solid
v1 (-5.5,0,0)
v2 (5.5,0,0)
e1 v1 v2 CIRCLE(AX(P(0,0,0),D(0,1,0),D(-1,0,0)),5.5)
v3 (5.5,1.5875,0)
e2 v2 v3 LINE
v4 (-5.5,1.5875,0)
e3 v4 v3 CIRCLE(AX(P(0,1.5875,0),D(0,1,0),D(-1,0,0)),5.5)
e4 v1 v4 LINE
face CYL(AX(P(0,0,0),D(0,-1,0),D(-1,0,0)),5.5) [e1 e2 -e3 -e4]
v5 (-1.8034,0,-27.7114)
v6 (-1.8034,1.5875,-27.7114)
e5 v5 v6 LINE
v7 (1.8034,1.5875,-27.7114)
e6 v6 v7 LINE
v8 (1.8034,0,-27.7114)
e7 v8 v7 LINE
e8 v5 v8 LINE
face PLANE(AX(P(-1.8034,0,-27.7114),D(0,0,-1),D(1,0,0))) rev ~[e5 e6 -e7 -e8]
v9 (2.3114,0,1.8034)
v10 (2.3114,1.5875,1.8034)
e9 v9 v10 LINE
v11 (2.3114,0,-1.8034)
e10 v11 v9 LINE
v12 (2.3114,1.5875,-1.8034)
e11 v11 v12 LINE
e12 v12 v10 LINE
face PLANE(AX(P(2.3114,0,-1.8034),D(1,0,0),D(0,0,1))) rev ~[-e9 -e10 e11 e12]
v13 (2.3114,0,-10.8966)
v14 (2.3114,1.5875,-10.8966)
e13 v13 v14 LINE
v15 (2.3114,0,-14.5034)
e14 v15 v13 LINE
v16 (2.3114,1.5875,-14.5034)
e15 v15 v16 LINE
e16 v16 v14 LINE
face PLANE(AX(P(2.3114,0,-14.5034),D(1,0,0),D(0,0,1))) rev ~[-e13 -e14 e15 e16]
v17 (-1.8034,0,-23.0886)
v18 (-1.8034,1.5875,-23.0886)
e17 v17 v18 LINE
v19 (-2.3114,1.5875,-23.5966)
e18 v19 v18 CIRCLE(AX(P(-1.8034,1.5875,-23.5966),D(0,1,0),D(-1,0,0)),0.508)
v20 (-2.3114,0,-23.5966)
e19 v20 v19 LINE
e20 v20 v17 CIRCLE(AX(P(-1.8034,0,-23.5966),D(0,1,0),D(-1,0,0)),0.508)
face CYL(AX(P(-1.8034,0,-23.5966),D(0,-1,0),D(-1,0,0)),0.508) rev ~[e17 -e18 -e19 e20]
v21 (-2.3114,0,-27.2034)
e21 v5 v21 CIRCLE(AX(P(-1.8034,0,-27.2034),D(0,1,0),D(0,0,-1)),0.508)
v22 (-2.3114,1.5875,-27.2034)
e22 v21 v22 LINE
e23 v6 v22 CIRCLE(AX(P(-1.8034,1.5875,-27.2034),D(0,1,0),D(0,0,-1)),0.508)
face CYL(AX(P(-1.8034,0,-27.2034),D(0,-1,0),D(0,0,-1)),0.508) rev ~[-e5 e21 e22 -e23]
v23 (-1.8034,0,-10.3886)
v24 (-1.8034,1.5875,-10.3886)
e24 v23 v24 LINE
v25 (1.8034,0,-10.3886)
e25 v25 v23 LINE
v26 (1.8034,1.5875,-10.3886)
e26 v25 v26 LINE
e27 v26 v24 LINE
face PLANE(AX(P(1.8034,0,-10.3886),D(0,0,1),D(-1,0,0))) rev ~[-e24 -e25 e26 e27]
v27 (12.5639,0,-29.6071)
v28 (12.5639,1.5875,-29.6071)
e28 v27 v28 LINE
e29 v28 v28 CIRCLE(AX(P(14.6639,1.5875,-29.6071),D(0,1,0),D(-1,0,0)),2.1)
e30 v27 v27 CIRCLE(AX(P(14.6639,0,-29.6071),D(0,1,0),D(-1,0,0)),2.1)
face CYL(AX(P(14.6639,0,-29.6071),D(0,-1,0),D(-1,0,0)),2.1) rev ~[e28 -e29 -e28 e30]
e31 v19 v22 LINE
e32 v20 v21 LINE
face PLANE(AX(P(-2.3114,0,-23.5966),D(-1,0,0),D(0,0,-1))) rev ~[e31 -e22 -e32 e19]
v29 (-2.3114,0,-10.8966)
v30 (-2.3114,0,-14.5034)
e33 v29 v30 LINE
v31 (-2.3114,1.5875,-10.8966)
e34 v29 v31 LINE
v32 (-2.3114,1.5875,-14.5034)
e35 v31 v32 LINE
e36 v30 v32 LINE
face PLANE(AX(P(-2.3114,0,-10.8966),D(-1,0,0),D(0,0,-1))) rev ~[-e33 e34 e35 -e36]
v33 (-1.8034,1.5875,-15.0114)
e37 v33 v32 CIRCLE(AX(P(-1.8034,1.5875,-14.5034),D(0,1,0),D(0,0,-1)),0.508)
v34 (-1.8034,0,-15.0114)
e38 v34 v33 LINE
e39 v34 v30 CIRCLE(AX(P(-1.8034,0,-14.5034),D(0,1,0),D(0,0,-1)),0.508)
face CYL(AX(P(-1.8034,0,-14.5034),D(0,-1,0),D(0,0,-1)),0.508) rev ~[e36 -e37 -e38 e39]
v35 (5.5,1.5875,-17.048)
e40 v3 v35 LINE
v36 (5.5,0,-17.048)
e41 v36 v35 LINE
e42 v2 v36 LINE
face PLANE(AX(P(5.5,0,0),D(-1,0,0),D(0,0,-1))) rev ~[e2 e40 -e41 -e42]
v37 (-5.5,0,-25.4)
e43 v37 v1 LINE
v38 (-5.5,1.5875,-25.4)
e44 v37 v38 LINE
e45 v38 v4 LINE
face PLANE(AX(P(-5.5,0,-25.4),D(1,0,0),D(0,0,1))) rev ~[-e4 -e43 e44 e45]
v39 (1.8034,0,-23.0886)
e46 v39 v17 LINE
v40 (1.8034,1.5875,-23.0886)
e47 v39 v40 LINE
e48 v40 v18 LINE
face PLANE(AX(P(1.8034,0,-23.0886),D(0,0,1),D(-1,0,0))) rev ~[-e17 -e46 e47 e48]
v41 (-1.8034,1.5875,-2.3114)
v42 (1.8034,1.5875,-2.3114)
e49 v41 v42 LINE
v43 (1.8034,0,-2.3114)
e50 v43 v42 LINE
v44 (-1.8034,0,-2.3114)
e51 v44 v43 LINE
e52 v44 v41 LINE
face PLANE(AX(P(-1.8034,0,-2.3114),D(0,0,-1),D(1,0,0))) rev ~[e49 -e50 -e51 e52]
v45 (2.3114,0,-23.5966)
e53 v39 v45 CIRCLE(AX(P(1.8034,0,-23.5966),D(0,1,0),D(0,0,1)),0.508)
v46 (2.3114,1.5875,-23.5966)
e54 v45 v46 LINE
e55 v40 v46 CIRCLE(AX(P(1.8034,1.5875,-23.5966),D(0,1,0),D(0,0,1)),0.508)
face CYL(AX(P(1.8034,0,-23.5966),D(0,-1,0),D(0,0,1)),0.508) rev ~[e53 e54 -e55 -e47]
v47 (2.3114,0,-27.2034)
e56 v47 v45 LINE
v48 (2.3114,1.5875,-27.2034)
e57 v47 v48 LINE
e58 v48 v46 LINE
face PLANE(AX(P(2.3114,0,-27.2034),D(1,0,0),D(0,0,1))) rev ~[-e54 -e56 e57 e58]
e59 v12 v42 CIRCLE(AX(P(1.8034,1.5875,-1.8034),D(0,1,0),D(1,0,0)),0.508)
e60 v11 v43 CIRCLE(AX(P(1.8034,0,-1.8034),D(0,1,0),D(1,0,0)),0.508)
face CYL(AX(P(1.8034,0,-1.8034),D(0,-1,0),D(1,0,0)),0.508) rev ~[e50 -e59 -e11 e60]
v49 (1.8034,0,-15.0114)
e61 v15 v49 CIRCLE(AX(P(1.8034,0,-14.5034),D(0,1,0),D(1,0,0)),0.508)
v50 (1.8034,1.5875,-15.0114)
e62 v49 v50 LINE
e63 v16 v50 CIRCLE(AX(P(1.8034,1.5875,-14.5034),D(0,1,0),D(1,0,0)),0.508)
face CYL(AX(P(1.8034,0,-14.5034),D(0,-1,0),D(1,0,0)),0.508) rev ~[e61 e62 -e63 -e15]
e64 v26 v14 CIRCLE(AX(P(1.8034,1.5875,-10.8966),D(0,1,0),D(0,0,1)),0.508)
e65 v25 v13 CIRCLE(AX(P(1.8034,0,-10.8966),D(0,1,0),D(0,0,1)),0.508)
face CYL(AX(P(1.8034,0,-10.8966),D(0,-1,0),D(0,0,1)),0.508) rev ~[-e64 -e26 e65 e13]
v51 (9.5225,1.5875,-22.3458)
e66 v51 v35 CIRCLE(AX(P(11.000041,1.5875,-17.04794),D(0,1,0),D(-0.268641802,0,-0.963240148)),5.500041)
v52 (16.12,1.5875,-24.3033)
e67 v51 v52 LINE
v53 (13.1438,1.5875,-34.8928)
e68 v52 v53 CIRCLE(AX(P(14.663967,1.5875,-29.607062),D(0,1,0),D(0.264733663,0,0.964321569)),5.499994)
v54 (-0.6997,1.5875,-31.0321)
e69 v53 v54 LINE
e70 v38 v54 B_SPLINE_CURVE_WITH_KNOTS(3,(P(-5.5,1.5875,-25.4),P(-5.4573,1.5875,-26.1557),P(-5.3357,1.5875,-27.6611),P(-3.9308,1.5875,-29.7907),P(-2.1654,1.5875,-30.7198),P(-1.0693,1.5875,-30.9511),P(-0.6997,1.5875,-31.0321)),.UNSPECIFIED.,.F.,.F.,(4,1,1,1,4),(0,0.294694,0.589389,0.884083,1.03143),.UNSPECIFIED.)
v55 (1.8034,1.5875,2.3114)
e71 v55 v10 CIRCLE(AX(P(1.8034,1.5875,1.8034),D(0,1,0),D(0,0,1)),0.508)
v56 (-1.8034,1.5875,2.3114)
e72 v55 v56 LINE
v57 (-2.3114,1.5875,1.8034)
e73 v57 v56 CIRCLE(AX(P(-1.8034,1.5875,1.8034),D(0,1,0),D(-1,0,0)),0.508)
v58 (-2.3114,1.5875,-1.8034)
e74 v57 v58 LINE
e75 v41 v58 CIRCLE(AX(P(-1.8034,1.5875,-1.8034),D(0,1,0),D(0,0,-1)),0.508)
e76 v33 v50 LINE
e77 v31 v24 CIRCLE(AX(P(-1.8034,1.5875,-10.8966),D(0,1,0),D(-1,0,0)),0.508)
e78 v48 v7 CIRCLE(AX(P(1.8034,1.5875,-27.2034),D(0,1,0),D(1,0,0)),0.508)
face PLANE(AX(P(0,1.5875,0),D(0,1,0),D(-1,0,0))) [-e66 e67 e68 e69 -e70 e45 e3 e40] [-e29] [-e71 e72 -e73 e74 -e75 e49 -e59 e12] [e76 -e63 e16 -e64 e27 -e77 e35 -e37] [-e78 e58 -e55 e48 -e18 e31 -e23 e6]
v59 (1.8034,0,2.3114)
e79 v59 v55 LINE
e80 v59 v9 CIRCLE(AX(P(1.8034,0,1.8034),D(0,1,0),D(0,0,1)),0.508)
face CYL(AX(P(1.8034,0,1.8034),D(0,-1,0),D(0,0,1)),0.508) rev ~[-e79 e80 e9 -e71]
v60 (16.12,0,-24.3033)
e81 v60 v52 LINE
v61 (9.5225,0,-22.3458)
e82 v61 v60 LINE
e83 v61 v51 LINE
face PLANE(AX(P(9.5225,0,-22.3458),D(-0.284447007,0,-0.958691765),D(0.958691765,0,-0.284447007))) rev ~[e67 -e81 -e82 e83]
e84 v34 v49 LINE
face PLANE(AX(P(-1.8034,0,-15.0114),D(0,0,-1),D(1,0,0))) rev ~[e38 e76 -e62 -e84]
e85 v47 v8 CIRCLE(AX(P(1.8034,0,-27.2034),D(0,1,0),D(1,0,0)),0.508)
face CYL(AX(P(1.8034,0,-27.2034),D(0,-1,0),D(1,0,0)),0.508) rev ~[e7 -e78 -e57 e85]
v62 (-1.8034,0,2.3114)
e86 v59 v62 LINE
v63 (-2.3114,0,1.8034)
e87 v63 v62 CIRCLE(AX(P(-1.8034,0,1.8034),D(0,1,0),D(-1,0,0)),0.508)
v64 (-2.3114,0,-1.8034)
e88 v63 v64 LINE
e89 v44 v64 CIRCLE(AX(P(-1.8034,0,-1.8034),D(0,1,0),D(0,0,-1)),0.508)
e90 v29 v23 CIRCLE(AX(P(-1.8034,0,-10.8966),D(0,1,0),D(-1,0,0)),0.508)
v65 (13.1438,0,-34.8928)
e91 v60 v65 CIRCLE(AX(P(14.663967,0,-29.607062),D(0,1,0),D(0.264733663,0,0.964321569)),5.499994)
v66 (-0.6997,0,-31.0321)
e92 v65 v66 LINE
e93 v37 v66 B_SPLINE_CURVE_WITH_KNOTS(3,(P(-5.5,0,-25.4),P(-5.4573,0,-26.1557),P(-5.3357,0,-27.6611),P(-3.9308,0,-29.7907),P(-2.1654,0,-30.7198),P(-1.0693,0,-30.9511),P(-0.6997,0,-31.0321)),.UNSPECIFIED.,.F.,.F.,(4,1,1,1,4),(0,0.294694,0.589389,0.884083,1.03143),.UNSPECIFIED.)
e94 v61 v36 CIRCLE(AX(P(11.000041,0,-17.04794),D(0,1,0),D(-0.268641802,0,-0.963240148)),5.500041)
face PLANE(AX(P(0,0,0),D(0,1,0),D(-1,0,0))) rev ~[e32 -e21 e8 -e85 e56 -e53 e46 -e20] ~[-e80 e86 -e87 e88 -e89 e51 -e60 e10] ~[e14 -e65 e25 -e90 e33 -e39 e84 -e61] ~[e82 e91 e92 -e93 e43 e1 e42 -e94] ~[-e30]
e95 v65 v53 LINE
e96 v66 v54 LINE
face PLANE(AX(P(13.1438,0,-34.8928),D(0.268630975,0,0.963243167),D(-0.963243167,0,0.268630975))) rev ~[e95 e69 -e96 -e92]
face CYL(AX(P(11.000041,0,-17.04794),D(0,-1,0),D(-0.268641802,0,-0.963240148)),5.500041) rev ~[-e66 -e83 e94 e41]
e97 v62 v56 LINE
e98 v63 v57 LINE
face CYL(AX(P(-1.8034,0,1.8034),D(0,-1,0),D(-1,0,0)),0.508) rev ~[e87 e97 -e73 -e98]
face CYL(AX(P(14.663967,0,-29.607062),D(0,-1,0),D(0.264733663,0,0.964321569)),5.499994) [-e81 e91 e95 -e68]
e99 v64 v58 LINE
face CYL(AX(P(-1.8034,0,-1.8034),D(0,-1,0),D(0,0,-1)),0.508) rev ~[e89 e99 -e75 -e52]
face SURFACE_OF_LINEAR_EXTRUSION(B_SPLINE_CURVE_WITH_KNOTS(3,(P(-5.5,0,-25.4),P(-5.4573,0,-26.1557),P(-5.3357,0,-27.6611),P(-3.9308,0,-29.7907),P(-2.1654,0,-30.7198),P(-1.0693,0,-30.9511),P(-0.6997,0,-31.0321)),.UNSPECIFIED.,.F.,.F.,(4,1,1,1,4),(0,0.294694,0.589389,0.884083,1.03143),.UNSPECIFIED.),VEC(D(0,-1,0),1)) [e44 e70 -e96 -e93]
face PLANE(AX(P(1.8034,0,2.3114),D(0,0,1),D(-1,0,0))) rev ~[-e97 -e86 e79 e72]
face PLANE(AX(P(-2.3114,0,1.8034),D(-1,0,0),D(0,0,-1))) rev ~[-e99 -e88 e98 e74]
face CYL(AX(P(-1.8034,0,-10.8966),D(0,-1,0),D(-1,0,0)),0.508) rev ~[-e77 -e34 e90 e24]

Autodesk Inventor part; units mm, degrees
ref_plane "YZ Plane" through (0, 0, 0) normal (1, 0, 0) x (0, 1, 0)
ref_plane "XZ Plane" through (0, 0, 0) normal (0, 1, 0) x (-1, 0, 0)
ref_plane "XY Plane" through (0, 0, 0) normal (0, 0, 1) x (1, 0, 0)
sketch "main" plane through (0, 0, 0) normal (0, 0, 1) x (1, 0, 0)
  line L0 (-3.1973, -8.3156) -> (0.4095, -8.3156)
  arc A0 (-3.1973, -8.3156) -> (-3.7053, -8.8236) centre (-3.1973, -8.8236) ccw
  arc A1 (0.9175, -8.8236) -> (0.4095, -8.3156) centre (0.4095, -8.8236) ccw
  line L1 (-3.7053, -12.4304) -> (-3.7053, -8.8236)
  line L2 (0.9175, -8.8236) -> (0.9175, -12.4304)
  arc A2 (-3.7053, -12.4304) -> (-3.1973, -12.9384) centre (-3.1973, -12.4304) ccw
  line L3 (0.4095, -12.9384) -> (-3.1973, -12.9384)
  arc A3 (0.4095, -12.9384) -> (0.9175, -12.4304) centre (0.4095, -12.4304) ccw
  spline S0 degree 3 poles (4.1061, -10.627) (4.0635, -11.3826) (3.9418, -12.8881) (2.5369, -15.0176) (0.7715, -15.9468) (-0.3245, -16.1781) (-0.6942, -16.259) knots 0 0 0 0 0.294694 0.589389 0.884083 1.03143 1.03143 1.03143 1.03143
  arc A4 (-10.9164, -7.5728) -> (-6.8939, -2.275) centre (-12.3939, -2.275) ccw
  line L4 (-14.5376, -20.1198) -> (-0.6942, -16.259)
  line L5 (-10.9164, -7.5728) -> (-17.5138, -9.5303)
  arc A5 (-17.5138, -9.5303) -> (-14.5376, -20.1198) centre (-16.0578, -14.834) ccw
  circle A6 centre (-16.0578, -14.834) radius 2.1
  line L6 (0.4095, -0.2384) -> (-3.1973, -0.2384)
  arc A7 (-3.7053, 0.2696) -> (-3.1973, -0.2384) centre (-3.1973, 0.2696) ccw
  line L7 (0.9175, 3.8764) -> (0.9175, 0.2696)
  line L8 (-3.7053, 0.2696) -> (-3.7053, 3.8764)
  line L9 (-3.1973, 4.3844) -> (0.4095, 4.3844)
  arc A8 (-3.1973, 4.3844) -> (-3.7053, 3.8764) centre (-3.1973, 3.8764) ccw
  arc A9 (0.9175, 3.8764) -> (0.4095, 4.3844) centre (0.4095, 3.8764) ccw
  arc A10 (0.4095, -0.2384) -> (0.9175, 0.2696) centre (0.4095, 0.2696) ccw
  line L10 (4.1061, -10.627) -> (4.1061, 14.773)
  arc A11 (4.1061, 14.773) -> (-6.8939, 14.773) centre (-1.3939, 14.773) ccw
  line L11 (-6.8939, 14.773) -> (-6.8939, -2.275)
  line L12 (0.4095, 12.4616) -> (-3.1973, 12.4616)
  arc A12 (0.4095, 12.4616) -> (0.9175, 12.9696) centre (0.4095, 12.9696) ccw
  arc A13 (-3.7053, 12.9696) -> (-3.1973, 12.4616) centre (-3.1973, 12.9696) ccw
  line L13 (0.9175, 16.5764) -> (0.9175, 12.9696)
  line L14 (-3.7053, 12.9696) -> (-3.7053, 16.5764)
  arc A14 (-3.1973, 17.0844) -> (-3.7053, 16.5764) centre (-3.1973, 16.5764) ccw
  arc A15 (0.9175, 16.5764) -> (0.4095, 17.0844) centre (0.4095, 16.5764) ccw
  line L15 (-3.1973, 17.0844) -> (0.4095, 17.0844)
  line L16 (-15.2156, -14.4817) -> (-14.3027, -14.4817) construction
  point P0 (-2.9609, 0.4438)
  point P1 (-20.5005, 14.8552)
  dimension "d8" = 5.5
sketch "Sketch1" plane through (0, 0, 0) normal (0, 1, 0) x (-1, 0, 0)
  line L0 (-1.8034, -23.0886) -> (1.8034, -23.0886)
  arc A0 (-1.8034, -23.0886) -> (-2.3114, -23.5966) centre (-1.8034, -23.5966) ccw
  arc A1 (2.3114, -23.5966) -> (1.8034, -23.0886) centre (1.8034, -23.5966) ccw
  line L1 (-2.3114, -27.2034) -> (-2.3114, -23.5966)
  line L2 (2.3114, -23.5966) -> (2.3114, -27.2034)
  arc A2 (-2.3114, -27.2034) -> (-1.8034, -27.7114) centre (-1.8034, -27.2034) ccw
  line L3 (1.8034, -27.7114) -> (-1.8034, -27.7114)
  arc A3 (1.8034, -27.7114) -> (2.3114, -27.2034) centre (1.8034, -27.2034) ccw
  spline S0 degree 3 poles (5.5, -25.4) (5.4573, -26.1557) (5.3357, -27.6611) (3.9308, -29.7907) (2.1654, -30.7198) (1.0693, -30.9511) (0.6997, -31.0321) knots 0 0 0 0 0.294694 0.589389 0.884083 1.03143 1.03143 1.03143 1.03143
  arc A4 (-9.5225, -22.3458) -> (-5.5, -17.048) centre (-11, -17.048) ccw
  line L4 (-13.1438, -34.8928) -> (0.6997, -31.0321)
  line L5 (-9.5225, -22.3458) -> (-16.12, -24.3033)
  arc A5 (-16.12, -24.3033) -> (-13.1438, -34.8928) centre (-14.6639, -29.6071) ccw
  circle A6 centre (-14.6639, -29.6071) radius 2.1
  line L6 (1.8034, -15.0114) -> (-1.8034, -15.0114)
  arc A7 (-2.3114, -14.5034) -> (-1.8034, -15.0114) centre (-1.8034, -14.5034) ccw
  line L7 (2.3114, -10.8966) -> (2.3114, -14.5034)
  line L8 (-2.3114, -14.5034) -> (-2.3114, -10.8966)
  line L9 (-1.8034, -10.3886) -> (1.8034, -10.3886)
  arc A8 (-1.8034, -10.3886) -> (-2.3114, -10.8966) centre (-1.8034, -10.8966) ccw
  arc A9 (2.3114, -10.8966) -> (1.8034, -10.3886) centre (1.8034, -10.8966) ccw
  arc A10 (1.8034, -15.0114) -> (2.3114, -14.5034) centre (1.8034, -14.5034) ccw
  line L10 (5.5, -25.4) -> (5.5, 0)
  arc A11 (5.5, 0) -> (-5.5, 0) centre (0, 0) ccw
  line L11 (-5.5, 0) -> (-5.5, -17.048)
  line L12 (1.8034, -2.3114) -> (-1.8034, -2.3114)
  arc A12 (1.8034, -2.3114) -> (2.3114, -1.8034) centre (1.8034, -1.8034) ccw
  arc A13 (-2.3114, -1.8034) -> (-1.8034, -2.3114) centre (-1.8034, -1.8034) ccw
  line L13 (2.3114, 1.8034) -> (2.3114, -1.8034)
  line L14 (-2.3114, -1.8034) -> (-2.3114, 1.8034)
  arc A14 (-1.8034, 2.3114) -> (-2.3114, 1.8034) centre (-1.8034, 1.8034) ccw
  arc A15 (2.3114, 1.8034) -> (1.8034, 2.3114) centre (1.8034, 1.8034) ccw
  line L15 (-1.8034, 2.3114) -> (1.8034, 2.3114)
  line L16 (-13.8217, -29.2547) -> (-12.9088, -29.2547) construction
extrude "Extrusion1" add sketch "Sketch1" along normal blind 1.5875
properties part number "bent_gusset" material "Acetal Resin, White"
